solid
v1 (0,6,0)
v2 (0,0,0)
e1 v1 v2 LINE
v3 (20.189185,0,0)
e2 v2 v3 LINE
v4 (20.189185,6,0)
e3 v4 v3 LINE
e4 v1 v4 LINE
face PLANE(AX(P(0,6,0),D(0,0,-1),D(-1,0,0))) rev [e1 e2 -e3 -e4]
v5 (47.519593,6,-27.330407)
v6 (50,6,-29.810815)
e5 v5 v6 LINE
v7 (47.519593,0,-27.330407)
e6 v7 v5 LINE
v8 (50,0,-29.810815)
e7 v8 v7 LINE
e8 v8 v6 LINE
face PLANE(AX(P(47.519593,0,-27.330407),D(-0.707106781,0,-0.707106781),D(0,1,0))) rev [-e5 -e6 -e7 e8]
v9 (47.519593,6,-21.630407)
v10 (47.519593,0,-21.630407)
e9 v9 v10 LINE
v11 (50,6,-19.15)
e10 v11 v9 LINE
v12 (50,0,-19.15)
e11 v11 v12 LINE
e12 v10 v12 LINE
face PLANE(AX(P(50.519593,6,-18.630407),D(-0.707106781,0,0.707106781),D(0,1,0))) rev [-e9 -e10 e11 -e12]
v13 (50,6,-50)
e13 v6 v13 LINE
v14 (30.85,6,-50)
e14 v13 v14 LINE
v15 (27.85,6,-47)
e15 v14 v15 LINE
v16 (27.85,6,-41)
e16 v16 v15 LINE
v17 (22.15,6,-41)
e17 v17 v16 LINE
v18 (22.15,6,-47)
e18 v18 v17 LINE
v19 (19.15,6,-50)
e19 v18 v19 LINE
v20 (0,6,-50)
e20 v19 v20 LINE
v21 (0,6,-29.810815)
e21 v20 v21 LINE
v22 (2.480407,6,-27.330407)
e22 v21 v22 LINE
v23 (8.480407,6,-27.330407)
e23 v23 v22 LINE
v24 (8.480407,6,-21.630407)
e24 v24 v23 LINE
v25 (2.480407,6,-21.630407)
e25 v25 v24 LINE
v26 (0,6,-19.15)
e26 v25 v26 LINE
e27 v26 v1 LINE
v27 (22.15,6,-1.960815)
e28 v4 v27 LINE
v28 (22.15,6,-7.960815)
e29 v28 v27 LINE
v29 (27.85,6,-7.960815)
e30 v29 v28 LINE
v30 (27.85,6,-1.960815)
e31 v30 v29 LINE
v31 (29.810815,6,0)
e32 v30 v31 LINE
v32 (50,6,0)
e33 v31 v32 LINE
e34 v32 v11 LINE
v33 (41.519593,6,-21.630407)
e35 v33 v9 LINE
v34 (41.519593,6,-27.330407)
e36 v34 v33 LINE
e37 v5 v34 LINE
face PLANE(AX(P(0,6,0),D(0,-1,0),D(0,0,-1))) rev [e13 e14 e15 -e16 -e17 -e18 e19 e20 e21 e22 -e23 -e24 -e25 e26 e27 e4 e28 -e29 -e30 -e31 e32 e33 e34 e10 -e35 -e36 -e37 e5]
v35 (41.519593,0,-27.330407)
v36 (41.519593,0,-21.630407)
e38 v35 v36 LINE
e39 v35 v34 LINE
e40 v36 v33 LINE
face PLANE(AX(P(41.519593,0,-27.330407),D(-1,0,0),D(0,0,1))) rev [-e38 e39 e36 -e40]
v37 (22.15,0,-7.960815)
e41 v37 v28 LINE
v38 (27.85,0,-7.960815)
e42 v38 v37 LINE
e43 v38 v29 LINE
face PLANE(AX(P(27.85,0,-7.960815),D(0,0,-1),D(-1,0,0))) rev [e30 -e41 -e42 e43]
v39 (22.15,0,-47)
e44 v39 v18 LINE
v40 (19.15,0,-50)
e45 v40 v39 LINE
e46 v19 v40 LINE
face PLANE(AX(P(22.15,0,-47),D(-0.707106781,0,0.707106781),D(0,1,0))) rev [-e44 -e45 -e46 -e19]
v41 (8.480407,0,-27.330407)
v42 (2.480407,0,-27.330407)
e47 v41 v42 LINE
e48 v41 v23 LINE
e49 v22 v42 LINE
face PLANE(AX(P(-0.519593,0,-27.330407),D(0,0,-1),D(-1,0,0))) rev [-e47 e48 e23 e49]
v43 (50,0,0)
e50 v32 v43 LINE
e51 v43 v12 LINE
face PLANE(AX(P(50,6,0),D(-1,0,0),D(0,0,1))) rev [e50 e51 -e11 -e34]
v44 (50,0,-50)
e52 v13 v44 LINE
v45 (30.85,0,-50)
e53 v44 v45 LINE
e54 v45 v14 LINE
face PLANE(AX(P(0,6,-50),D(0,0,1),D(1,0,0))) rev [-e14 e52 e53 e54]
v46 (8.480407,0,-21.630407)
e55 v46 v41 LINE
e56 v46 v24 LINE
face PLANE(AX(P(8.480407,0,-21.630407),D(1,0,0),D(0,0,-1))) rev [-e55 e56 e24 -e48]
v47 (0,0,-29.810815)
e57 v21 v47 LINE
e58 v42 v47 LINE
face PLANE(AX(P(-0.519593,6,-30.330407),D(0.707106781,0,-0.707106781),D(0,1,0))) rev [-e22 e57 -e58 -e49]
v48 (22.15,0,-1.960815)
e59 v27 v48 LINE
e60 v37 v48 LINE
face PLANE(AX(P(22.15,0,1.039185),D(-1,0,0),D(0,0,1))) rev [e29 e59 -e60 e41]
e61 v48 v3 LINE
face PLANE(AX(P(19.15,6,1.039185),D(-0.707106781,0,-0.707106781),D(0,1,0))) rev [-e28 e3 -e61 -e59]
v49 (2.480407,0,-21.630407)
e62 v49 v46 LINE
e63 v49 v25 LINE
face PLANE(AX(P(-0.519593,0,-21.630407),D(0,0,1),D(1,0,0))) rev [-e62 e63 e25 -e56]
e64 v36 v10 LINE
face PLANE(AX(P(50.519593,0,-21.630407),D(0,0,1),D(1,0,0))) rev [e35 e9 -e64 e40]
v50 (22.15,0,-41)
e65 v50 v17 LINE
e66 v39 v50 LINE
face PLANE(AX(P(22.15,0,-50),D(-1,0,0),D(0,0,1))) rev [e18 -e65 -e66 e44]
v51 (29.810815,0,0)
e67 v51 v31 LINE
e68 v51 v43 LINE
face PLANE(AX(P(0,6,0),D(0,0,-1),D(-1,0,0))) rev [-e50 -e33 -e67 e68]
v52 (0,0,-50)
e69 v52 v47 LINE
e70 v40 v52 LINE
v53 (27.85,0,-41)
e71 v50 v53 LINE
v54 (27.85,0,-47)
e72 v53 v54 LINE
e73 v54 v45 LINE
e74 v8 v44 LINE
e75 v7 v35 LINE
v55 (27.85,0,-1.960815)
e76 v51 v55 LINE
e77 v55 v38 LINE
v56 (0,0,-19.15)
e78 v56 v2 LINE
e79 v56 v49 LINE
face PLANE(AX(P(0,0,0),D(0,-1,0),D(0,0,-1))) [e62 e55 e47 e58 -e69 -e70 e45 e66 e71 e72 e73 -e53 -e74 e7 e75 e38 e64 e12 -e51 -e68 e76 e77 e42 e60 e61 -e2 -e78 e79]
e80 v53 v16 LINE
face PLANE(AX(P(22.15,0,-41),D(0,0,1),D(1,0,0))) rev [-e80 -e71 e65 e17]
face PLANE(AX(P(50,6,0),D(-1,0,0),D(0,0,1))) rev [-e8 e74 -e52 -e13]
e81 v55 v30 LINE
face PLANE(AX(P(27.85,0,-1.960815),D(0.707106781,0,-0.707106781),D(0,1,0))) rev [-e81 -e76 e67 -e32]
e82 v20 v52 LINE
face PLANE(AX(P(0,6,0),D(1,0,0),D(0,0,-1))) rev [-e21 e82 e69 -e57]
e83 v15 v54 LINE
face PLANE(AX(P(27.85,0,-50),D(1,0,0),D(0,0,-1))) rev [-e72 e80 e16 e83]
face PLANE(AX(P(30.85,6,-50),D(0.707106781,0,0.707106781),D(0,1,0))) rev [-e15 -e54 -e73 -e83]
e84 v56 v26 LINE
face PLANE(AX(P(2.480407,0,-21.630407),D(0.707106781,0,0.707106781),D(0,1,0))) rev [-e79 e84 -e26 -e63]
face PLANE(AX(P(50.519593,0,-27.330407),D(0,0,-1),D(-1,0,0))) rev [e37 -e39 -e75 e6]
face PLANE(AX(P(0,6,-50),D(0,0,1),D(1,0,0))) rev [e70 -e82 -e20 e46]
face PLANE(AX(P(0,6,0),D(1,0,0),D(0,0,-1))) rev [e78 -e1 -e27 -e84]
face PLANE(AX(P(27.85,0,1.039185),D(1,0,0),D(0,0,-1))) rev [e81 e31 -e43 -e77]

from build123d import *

# Parameters (mm, degrees)
SKETCH1_W           = 50
SKETCH1_H           = 50
BOSS_EXTRUDE1_DEPTH = 6
SKETCH2_W           = 5.7
SKETCH2_H           = 9
CUT_EXTRUDE1_DEPTH  = 6
CHAMFER2_SIZE       = 3
CIRPATTERN4_DEPTH   = 6


# Read off the part's stored shape, not the designer's step: CirPattern4
with BuildPart() as part:
    # Sketch1 → Boss-Extrude1 (new body)
    with BuildSketch(Plane(origin=(0, 0, 0), x_dir=(1, 0, 0), z_dir=(0, 1, 0))):
        with Locations((25, 25)):
            Rectangle(SKETCH1_W, SKETCH1_H)
    extrude(amount=BOSS_EXTRUDE1_DEPTH)

    # Sketch2 → Cut-Extrude1 (cut)
    with BuildSketch(Plane(origin=(0, 6, 0), x_dir=(1, 0, 0), z_dir=(0, 1, 0))):
        with Locations((25, 45.5)):
            Rectangle(SKETCH2_W, SKETCH2_H)
    extrude(amount=-CUT_EXTRUDE1_DEPTH, mode=Mode.SUBTRACT)

    # Chamfer2
    chamfer2_edges = [part.edges().sort_by_distance(p)[0] for p in [
        (22.15, 3, -50),
        (27.85, 3, -50),
    ]]
    chamfer(chamfer2_edges, length=CHAMFER2_SIZE)

    # CirPattern4 outline → CirPattern4 (cut)
    with BuildSketch(Plane(origin=(0, 0, 0), x_dir=(1, 0, 0), z_dir=(0, 1, 0))):
        Polygon((27.85, 7.960814854), (22.15, 7.960814854), (22.15, 1.960814854), (20.189185146, 0), (29.810814854, 0), (27.85, 1.960814854), align=None)
        Polygon((47.519592573, 21.630407427), (50, 19.15), (50, 29.810814854), (47.519592573, 27.330407427), (41.519592573, 27.330407427), (41.519592573, 21.630407427), align=None)
        Polygon((0, 29.810814854), (0, 19.15), (2.480407427, 21.630407427), (8.480407427, 21.630407427), (8.480407427, 27.330407427), (2.480407427, 27.330407427), align=None)
    extrude(amount=CIRPATTERN4_DEPTH, mode=Mode.SUBTRACT)


solid = part.part
